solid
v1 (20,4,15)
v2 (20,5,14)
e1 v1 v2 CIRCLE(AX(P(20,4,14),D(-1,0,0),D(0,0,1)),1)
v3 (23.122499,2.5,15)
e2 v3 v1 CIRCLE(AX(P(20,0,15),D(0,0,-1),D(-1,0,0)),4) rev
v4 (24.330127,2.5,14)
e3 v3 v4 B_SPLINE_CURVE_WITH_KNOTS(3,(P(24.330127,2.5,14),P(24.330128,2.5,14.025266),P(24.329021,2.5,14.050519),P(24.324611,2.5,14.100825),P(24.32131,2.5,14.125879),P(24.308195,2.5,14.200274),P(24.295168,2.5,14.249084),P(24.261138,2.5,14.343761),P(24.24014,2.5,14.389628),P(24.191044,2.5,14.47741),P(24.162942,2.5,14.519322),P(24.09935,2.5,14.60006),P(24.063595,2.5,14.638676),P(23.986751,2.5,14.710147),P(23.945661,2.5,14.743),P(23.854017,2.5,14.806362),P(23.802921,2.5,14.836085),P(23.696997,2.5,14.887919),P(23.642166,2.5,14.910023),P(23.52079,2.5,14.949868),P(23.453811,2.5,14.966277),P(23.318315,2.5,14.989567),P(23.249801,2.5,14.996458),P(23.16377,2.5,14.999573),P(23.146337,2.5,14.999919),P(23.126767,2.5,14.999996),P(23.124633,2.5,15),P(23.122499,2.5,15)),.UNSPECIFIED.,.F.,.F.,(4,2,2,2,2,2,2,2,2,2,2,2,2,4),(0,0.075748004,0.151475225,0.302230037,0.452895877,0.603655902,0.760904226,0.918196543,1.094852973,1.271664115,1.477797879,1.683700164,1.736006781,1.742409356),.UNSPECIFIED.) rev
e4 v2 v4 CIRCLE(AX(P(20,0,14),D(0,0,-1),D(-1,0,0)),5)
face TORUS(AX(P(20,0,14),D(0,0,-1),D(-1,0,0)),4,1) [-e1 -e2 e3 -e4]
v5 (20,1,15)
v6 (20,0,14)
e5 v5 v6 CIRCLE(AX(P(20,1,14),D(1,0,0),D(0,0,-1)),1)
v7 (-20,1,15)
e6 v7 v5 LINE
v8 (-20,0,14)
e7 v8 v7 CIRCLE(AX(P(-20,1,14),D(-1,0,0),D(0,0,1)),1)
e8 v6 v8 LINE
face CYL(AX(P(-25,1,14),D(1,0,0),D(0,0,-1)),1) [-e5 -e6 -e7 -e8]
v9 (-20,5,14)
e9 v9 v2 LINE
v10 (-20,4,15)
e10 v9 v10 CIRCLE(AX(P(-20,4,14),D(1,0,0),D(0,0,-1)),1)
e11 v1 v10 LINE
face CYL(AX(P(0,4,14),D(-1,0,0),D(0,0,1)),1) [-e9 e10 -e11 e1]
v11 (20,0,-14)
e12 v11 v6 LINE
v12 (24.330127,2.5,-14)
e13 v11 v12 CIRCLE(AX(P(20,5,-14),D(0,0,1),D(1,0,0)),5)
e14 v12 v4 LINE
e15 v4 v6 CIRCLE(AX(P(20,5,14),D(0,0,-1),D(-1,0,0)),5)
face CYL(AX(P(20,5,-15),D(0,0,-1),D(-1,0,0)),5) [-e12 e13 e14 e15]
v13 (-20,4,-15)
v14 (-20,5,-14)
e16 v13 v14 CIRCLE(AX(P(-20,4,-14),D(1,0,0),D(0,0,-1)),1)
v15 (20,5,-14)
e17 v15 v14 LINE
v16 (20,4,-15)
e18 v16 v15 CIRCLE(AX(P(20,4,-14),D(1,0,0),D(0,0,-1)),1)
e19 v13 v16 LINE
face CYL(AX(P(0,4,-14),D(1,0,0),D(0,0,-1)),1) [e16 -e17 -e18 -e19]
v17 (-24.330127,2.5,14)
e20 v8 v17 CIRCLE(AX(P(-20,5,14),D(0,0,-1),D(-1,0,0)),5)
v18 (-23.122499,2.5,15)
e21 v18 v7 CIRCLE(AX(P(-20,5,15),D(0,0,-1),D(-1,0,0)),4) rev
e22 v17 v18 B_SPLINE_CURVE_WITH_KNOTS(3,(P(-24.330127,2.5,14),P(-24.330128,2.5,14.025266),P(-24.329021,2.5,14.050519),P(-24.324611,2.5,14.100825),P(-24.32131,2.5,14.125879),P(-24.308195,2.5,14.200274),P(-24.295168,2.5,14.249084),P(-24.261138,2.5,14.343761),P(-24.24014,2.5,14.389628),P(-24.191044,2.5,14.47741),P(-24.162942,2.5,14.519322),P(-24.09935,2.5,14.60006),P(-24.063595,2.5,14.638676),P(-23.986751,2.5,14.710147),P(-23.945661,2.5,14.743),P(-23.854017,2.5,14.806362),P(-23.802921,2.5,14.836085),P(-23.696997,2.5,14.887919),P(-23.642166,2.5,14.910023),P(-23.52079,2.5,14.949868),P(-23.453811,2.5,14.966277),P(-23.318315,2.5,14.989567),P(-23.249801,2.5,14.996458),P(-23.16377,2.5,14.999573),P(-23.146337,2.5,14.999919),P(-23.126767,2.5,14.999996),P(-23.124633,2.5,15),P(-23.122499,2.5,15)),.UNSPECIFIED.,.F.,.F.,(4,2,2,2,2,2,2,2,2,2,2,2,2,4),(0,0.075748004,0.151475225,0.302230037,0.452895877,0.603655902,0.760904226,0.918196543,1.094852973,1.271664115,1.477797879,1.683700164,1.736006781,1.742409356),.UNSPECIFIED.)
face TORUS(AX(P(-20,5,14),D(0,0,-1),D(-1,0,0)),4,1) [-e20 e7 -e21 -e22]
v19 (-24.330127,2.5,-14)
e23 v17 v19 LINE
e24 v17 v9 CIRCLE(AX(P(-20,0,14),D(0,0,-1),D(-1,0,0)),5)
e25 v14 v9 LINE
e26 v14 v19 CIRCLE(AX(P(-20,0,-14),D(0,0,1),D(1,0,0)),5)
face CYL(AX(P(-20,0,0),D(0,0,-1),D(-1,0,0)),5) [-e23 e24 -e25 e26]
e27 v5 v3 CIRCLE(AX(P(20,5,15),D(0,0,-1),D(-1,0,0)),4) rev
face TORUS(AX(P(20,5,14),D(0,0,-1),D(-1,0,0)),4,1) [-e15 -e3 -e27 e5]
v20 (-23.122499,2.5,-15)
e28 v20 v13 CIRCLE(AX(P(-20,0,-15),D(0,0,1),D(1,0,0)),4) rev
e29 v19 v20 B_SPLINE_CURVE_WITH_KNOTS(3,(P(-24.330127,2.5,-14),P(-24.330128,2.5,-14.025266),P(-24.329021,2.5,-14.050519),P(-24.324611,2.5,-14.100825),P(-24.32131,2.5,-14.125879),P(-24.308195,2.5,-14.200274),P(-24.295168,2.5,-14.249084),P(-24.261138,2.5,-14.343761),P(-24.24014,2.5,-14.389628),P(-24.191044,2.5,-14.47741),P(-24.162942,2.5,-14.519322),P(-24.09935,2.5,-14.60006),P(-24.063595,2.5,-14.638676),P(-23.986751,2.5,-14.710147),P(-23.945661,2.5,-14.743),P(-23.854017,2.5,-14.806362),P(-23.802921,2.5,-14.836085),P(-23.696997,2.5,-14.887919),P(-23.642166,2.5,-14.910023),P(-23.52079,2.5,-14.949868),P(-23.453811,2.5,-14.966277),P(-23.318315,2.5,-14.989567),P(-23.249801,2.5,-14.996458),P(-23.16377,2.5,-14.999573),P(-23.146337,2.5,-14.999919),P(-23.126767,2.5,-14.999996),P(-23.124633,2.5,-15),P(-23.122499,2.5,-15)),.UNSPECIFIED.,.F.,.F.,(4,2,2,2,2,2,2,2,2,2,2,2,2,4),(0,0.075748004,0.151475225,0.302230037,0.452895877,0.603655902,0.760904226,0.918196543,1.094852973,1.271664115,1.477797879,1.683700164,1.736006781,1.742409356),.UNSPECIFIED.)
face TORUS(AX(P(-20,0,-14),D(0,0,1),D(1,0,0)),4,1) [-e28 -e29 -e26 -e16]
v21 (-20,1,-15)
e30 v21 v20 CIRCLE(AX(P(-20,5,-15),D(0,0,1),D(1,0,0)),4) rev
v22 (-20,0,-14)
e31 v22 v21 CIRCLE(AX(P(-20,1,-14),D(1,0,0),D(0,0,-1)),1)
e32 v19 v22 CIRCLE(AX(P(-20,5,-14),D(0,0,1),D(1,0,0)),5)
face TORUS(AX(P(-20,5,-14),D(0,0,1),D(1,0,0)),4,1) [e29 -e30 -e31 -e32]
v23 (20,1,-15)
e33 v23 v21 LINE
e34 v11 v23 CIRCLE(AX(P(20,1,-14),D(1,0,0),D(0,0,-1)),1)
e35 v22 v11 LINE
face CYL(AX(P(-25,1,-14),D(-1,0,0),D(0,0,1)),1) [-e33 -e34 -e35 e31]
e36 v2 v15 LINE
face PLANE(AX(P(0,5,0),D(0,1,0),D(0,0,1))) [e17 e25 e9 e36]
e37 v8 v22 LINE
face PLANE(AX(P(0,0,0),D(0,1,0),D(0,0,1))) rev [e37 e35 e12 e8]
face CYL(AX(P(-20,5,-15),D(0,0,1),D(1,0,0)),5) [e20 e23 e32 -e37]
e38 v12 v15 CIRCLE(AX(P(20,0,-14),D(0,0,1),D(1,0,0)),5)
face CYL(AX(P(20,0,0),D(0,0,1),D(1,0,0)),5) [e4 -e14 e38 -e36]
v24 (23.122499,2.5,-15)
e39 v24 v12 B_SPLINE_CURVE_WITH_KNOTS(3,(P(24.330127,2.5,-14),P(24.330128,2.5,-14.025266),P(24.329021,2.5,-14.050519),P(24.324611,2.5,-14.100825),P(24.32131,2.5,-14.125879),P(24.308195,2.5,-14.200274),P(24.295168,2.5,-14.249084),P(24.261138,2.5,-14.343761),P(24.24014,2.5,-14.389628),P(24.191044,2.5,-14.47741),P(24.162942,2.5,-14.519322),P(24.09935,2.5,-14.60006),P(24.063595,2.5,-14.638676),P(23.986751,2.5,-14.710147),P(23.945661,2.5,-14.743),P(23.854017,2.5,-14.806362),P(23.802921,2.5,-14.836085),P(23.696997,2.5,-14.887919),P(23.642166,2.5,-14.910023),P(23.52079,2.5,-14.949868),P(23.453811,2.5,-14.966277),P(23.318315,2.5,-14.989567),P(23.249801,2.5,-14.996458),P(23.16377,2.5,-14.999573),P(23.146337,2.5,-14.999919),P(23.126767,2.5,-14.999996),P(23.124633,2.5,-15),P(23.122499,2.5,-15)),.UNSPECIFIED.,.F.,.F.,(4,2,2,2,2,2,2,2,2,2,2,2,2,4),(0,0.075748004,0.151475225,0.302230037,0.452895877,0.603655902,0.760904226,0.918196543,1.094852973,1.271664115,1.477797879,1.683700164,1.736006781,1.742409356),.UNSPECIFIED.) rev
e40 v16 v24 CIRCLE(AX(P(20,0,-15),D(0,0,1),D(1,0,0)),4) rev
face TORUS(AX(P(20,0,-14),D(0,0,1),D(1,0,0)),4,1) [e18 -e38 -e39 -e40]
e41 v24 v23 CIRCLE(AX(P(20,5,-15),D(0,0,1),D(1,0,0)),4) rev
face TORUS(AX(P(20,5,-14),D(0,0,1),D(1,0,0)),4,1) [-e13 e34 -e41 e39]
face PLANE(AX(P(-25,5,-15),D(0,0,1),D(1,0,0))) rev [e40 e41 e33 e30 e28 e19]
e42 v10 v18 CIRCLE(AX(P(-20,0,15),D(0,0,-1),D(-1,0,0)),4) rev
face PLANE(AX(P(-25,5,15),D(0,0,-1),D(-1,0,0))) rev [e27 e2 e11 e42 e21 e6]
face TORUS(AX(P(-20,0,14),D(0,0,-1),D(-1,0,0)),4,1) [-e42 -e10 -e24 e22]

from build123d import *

# Parameters (mm, degrees)
SKETCH1_W           = 50
SKETCH1_H           = 30
BOSS_EXTRUDE1_DEPTH = 5
FILLET1_R           = 5
FILLET2_R           = 1


with BuildPart() as part:
    # Sketch1 → Boss-Extrude1 (new body)
    with BuildSketch(Plane(origin=(0, 0, 0), x_dir=(1, 0, 0), z_dir=(0, 1, 0))):
        Rectangle(SKETCH1_W, SKETCH1_H)
    extrude(amount=BOSS_EXTRUDE1_DEPTH)

    # Fillet1
    # the kernel refuses this fillet: 5 mm, written as the material it takes off along each edge
    with BuildSketch(Plane(origin=(-25, 0, 27.5), x_dir=(0, 1, 0), z_dir=(0, 0, -1)), Plane(origin=(25, 0, -27.5), x_dir=(0, 1, 0), z_dir=(0, 0, 1))) as fillet1_piece_1:
        with BuildLine():
            CenterArc((FILLET1_R, FILLET1_R), FILLET1_R, 180, 90)
            Line((0, FILLET1_R), (0, 0))
            Line((0, 0), (FILLET1_R, 0))
        make_face()
    extrude(amount=55, mode=Mode.SUBTRACT)
    with BuildSketch(Plane(origin=(-25, 5, 27.5), x_dir=(0, -1, 0), z_dir=(0, 0, -1)), Plane(origin=(25, 5, -27.5), x_dir=(0, -1, 0), z_dir=(0, 0, 1))) as fillet1_piece_2:
        with BuildLine():
            CenterArc((FILLET1_R, -FILLET1_R), FILLET1_R, 90, 90)
            Line((0, -FILLET1_R), (0, 0))
            Line((0, 0), (FILLET1_R, 0))
        make_face()
    extrude(amount=55, mode=Mode.SUBTRACT)

    # Fillet2
    fillet2_edges = [part.edges().sort_by_distance(p)[0] for p in [
        (0, 0, 15),
        (0, 5, 15),
        (22.5, 4.330127019, 15),
        (22.5, 0.669872981, 15),
        (-22.5, 4.330127019, 15),
        (-22.5, 0.669872981, 15),
        (0, 0, -15),
        (0, 5, -15),
        (22.5, 4.330127019, -15),
        (22.5, 0.669872981, -15),
        (-22.5, 4.330127019, -15),
        (-22.5, 0.669872981, -15),
    ]]
    fillet(fillet2_edges, radius=FILLET2_R)


solid = part.part
